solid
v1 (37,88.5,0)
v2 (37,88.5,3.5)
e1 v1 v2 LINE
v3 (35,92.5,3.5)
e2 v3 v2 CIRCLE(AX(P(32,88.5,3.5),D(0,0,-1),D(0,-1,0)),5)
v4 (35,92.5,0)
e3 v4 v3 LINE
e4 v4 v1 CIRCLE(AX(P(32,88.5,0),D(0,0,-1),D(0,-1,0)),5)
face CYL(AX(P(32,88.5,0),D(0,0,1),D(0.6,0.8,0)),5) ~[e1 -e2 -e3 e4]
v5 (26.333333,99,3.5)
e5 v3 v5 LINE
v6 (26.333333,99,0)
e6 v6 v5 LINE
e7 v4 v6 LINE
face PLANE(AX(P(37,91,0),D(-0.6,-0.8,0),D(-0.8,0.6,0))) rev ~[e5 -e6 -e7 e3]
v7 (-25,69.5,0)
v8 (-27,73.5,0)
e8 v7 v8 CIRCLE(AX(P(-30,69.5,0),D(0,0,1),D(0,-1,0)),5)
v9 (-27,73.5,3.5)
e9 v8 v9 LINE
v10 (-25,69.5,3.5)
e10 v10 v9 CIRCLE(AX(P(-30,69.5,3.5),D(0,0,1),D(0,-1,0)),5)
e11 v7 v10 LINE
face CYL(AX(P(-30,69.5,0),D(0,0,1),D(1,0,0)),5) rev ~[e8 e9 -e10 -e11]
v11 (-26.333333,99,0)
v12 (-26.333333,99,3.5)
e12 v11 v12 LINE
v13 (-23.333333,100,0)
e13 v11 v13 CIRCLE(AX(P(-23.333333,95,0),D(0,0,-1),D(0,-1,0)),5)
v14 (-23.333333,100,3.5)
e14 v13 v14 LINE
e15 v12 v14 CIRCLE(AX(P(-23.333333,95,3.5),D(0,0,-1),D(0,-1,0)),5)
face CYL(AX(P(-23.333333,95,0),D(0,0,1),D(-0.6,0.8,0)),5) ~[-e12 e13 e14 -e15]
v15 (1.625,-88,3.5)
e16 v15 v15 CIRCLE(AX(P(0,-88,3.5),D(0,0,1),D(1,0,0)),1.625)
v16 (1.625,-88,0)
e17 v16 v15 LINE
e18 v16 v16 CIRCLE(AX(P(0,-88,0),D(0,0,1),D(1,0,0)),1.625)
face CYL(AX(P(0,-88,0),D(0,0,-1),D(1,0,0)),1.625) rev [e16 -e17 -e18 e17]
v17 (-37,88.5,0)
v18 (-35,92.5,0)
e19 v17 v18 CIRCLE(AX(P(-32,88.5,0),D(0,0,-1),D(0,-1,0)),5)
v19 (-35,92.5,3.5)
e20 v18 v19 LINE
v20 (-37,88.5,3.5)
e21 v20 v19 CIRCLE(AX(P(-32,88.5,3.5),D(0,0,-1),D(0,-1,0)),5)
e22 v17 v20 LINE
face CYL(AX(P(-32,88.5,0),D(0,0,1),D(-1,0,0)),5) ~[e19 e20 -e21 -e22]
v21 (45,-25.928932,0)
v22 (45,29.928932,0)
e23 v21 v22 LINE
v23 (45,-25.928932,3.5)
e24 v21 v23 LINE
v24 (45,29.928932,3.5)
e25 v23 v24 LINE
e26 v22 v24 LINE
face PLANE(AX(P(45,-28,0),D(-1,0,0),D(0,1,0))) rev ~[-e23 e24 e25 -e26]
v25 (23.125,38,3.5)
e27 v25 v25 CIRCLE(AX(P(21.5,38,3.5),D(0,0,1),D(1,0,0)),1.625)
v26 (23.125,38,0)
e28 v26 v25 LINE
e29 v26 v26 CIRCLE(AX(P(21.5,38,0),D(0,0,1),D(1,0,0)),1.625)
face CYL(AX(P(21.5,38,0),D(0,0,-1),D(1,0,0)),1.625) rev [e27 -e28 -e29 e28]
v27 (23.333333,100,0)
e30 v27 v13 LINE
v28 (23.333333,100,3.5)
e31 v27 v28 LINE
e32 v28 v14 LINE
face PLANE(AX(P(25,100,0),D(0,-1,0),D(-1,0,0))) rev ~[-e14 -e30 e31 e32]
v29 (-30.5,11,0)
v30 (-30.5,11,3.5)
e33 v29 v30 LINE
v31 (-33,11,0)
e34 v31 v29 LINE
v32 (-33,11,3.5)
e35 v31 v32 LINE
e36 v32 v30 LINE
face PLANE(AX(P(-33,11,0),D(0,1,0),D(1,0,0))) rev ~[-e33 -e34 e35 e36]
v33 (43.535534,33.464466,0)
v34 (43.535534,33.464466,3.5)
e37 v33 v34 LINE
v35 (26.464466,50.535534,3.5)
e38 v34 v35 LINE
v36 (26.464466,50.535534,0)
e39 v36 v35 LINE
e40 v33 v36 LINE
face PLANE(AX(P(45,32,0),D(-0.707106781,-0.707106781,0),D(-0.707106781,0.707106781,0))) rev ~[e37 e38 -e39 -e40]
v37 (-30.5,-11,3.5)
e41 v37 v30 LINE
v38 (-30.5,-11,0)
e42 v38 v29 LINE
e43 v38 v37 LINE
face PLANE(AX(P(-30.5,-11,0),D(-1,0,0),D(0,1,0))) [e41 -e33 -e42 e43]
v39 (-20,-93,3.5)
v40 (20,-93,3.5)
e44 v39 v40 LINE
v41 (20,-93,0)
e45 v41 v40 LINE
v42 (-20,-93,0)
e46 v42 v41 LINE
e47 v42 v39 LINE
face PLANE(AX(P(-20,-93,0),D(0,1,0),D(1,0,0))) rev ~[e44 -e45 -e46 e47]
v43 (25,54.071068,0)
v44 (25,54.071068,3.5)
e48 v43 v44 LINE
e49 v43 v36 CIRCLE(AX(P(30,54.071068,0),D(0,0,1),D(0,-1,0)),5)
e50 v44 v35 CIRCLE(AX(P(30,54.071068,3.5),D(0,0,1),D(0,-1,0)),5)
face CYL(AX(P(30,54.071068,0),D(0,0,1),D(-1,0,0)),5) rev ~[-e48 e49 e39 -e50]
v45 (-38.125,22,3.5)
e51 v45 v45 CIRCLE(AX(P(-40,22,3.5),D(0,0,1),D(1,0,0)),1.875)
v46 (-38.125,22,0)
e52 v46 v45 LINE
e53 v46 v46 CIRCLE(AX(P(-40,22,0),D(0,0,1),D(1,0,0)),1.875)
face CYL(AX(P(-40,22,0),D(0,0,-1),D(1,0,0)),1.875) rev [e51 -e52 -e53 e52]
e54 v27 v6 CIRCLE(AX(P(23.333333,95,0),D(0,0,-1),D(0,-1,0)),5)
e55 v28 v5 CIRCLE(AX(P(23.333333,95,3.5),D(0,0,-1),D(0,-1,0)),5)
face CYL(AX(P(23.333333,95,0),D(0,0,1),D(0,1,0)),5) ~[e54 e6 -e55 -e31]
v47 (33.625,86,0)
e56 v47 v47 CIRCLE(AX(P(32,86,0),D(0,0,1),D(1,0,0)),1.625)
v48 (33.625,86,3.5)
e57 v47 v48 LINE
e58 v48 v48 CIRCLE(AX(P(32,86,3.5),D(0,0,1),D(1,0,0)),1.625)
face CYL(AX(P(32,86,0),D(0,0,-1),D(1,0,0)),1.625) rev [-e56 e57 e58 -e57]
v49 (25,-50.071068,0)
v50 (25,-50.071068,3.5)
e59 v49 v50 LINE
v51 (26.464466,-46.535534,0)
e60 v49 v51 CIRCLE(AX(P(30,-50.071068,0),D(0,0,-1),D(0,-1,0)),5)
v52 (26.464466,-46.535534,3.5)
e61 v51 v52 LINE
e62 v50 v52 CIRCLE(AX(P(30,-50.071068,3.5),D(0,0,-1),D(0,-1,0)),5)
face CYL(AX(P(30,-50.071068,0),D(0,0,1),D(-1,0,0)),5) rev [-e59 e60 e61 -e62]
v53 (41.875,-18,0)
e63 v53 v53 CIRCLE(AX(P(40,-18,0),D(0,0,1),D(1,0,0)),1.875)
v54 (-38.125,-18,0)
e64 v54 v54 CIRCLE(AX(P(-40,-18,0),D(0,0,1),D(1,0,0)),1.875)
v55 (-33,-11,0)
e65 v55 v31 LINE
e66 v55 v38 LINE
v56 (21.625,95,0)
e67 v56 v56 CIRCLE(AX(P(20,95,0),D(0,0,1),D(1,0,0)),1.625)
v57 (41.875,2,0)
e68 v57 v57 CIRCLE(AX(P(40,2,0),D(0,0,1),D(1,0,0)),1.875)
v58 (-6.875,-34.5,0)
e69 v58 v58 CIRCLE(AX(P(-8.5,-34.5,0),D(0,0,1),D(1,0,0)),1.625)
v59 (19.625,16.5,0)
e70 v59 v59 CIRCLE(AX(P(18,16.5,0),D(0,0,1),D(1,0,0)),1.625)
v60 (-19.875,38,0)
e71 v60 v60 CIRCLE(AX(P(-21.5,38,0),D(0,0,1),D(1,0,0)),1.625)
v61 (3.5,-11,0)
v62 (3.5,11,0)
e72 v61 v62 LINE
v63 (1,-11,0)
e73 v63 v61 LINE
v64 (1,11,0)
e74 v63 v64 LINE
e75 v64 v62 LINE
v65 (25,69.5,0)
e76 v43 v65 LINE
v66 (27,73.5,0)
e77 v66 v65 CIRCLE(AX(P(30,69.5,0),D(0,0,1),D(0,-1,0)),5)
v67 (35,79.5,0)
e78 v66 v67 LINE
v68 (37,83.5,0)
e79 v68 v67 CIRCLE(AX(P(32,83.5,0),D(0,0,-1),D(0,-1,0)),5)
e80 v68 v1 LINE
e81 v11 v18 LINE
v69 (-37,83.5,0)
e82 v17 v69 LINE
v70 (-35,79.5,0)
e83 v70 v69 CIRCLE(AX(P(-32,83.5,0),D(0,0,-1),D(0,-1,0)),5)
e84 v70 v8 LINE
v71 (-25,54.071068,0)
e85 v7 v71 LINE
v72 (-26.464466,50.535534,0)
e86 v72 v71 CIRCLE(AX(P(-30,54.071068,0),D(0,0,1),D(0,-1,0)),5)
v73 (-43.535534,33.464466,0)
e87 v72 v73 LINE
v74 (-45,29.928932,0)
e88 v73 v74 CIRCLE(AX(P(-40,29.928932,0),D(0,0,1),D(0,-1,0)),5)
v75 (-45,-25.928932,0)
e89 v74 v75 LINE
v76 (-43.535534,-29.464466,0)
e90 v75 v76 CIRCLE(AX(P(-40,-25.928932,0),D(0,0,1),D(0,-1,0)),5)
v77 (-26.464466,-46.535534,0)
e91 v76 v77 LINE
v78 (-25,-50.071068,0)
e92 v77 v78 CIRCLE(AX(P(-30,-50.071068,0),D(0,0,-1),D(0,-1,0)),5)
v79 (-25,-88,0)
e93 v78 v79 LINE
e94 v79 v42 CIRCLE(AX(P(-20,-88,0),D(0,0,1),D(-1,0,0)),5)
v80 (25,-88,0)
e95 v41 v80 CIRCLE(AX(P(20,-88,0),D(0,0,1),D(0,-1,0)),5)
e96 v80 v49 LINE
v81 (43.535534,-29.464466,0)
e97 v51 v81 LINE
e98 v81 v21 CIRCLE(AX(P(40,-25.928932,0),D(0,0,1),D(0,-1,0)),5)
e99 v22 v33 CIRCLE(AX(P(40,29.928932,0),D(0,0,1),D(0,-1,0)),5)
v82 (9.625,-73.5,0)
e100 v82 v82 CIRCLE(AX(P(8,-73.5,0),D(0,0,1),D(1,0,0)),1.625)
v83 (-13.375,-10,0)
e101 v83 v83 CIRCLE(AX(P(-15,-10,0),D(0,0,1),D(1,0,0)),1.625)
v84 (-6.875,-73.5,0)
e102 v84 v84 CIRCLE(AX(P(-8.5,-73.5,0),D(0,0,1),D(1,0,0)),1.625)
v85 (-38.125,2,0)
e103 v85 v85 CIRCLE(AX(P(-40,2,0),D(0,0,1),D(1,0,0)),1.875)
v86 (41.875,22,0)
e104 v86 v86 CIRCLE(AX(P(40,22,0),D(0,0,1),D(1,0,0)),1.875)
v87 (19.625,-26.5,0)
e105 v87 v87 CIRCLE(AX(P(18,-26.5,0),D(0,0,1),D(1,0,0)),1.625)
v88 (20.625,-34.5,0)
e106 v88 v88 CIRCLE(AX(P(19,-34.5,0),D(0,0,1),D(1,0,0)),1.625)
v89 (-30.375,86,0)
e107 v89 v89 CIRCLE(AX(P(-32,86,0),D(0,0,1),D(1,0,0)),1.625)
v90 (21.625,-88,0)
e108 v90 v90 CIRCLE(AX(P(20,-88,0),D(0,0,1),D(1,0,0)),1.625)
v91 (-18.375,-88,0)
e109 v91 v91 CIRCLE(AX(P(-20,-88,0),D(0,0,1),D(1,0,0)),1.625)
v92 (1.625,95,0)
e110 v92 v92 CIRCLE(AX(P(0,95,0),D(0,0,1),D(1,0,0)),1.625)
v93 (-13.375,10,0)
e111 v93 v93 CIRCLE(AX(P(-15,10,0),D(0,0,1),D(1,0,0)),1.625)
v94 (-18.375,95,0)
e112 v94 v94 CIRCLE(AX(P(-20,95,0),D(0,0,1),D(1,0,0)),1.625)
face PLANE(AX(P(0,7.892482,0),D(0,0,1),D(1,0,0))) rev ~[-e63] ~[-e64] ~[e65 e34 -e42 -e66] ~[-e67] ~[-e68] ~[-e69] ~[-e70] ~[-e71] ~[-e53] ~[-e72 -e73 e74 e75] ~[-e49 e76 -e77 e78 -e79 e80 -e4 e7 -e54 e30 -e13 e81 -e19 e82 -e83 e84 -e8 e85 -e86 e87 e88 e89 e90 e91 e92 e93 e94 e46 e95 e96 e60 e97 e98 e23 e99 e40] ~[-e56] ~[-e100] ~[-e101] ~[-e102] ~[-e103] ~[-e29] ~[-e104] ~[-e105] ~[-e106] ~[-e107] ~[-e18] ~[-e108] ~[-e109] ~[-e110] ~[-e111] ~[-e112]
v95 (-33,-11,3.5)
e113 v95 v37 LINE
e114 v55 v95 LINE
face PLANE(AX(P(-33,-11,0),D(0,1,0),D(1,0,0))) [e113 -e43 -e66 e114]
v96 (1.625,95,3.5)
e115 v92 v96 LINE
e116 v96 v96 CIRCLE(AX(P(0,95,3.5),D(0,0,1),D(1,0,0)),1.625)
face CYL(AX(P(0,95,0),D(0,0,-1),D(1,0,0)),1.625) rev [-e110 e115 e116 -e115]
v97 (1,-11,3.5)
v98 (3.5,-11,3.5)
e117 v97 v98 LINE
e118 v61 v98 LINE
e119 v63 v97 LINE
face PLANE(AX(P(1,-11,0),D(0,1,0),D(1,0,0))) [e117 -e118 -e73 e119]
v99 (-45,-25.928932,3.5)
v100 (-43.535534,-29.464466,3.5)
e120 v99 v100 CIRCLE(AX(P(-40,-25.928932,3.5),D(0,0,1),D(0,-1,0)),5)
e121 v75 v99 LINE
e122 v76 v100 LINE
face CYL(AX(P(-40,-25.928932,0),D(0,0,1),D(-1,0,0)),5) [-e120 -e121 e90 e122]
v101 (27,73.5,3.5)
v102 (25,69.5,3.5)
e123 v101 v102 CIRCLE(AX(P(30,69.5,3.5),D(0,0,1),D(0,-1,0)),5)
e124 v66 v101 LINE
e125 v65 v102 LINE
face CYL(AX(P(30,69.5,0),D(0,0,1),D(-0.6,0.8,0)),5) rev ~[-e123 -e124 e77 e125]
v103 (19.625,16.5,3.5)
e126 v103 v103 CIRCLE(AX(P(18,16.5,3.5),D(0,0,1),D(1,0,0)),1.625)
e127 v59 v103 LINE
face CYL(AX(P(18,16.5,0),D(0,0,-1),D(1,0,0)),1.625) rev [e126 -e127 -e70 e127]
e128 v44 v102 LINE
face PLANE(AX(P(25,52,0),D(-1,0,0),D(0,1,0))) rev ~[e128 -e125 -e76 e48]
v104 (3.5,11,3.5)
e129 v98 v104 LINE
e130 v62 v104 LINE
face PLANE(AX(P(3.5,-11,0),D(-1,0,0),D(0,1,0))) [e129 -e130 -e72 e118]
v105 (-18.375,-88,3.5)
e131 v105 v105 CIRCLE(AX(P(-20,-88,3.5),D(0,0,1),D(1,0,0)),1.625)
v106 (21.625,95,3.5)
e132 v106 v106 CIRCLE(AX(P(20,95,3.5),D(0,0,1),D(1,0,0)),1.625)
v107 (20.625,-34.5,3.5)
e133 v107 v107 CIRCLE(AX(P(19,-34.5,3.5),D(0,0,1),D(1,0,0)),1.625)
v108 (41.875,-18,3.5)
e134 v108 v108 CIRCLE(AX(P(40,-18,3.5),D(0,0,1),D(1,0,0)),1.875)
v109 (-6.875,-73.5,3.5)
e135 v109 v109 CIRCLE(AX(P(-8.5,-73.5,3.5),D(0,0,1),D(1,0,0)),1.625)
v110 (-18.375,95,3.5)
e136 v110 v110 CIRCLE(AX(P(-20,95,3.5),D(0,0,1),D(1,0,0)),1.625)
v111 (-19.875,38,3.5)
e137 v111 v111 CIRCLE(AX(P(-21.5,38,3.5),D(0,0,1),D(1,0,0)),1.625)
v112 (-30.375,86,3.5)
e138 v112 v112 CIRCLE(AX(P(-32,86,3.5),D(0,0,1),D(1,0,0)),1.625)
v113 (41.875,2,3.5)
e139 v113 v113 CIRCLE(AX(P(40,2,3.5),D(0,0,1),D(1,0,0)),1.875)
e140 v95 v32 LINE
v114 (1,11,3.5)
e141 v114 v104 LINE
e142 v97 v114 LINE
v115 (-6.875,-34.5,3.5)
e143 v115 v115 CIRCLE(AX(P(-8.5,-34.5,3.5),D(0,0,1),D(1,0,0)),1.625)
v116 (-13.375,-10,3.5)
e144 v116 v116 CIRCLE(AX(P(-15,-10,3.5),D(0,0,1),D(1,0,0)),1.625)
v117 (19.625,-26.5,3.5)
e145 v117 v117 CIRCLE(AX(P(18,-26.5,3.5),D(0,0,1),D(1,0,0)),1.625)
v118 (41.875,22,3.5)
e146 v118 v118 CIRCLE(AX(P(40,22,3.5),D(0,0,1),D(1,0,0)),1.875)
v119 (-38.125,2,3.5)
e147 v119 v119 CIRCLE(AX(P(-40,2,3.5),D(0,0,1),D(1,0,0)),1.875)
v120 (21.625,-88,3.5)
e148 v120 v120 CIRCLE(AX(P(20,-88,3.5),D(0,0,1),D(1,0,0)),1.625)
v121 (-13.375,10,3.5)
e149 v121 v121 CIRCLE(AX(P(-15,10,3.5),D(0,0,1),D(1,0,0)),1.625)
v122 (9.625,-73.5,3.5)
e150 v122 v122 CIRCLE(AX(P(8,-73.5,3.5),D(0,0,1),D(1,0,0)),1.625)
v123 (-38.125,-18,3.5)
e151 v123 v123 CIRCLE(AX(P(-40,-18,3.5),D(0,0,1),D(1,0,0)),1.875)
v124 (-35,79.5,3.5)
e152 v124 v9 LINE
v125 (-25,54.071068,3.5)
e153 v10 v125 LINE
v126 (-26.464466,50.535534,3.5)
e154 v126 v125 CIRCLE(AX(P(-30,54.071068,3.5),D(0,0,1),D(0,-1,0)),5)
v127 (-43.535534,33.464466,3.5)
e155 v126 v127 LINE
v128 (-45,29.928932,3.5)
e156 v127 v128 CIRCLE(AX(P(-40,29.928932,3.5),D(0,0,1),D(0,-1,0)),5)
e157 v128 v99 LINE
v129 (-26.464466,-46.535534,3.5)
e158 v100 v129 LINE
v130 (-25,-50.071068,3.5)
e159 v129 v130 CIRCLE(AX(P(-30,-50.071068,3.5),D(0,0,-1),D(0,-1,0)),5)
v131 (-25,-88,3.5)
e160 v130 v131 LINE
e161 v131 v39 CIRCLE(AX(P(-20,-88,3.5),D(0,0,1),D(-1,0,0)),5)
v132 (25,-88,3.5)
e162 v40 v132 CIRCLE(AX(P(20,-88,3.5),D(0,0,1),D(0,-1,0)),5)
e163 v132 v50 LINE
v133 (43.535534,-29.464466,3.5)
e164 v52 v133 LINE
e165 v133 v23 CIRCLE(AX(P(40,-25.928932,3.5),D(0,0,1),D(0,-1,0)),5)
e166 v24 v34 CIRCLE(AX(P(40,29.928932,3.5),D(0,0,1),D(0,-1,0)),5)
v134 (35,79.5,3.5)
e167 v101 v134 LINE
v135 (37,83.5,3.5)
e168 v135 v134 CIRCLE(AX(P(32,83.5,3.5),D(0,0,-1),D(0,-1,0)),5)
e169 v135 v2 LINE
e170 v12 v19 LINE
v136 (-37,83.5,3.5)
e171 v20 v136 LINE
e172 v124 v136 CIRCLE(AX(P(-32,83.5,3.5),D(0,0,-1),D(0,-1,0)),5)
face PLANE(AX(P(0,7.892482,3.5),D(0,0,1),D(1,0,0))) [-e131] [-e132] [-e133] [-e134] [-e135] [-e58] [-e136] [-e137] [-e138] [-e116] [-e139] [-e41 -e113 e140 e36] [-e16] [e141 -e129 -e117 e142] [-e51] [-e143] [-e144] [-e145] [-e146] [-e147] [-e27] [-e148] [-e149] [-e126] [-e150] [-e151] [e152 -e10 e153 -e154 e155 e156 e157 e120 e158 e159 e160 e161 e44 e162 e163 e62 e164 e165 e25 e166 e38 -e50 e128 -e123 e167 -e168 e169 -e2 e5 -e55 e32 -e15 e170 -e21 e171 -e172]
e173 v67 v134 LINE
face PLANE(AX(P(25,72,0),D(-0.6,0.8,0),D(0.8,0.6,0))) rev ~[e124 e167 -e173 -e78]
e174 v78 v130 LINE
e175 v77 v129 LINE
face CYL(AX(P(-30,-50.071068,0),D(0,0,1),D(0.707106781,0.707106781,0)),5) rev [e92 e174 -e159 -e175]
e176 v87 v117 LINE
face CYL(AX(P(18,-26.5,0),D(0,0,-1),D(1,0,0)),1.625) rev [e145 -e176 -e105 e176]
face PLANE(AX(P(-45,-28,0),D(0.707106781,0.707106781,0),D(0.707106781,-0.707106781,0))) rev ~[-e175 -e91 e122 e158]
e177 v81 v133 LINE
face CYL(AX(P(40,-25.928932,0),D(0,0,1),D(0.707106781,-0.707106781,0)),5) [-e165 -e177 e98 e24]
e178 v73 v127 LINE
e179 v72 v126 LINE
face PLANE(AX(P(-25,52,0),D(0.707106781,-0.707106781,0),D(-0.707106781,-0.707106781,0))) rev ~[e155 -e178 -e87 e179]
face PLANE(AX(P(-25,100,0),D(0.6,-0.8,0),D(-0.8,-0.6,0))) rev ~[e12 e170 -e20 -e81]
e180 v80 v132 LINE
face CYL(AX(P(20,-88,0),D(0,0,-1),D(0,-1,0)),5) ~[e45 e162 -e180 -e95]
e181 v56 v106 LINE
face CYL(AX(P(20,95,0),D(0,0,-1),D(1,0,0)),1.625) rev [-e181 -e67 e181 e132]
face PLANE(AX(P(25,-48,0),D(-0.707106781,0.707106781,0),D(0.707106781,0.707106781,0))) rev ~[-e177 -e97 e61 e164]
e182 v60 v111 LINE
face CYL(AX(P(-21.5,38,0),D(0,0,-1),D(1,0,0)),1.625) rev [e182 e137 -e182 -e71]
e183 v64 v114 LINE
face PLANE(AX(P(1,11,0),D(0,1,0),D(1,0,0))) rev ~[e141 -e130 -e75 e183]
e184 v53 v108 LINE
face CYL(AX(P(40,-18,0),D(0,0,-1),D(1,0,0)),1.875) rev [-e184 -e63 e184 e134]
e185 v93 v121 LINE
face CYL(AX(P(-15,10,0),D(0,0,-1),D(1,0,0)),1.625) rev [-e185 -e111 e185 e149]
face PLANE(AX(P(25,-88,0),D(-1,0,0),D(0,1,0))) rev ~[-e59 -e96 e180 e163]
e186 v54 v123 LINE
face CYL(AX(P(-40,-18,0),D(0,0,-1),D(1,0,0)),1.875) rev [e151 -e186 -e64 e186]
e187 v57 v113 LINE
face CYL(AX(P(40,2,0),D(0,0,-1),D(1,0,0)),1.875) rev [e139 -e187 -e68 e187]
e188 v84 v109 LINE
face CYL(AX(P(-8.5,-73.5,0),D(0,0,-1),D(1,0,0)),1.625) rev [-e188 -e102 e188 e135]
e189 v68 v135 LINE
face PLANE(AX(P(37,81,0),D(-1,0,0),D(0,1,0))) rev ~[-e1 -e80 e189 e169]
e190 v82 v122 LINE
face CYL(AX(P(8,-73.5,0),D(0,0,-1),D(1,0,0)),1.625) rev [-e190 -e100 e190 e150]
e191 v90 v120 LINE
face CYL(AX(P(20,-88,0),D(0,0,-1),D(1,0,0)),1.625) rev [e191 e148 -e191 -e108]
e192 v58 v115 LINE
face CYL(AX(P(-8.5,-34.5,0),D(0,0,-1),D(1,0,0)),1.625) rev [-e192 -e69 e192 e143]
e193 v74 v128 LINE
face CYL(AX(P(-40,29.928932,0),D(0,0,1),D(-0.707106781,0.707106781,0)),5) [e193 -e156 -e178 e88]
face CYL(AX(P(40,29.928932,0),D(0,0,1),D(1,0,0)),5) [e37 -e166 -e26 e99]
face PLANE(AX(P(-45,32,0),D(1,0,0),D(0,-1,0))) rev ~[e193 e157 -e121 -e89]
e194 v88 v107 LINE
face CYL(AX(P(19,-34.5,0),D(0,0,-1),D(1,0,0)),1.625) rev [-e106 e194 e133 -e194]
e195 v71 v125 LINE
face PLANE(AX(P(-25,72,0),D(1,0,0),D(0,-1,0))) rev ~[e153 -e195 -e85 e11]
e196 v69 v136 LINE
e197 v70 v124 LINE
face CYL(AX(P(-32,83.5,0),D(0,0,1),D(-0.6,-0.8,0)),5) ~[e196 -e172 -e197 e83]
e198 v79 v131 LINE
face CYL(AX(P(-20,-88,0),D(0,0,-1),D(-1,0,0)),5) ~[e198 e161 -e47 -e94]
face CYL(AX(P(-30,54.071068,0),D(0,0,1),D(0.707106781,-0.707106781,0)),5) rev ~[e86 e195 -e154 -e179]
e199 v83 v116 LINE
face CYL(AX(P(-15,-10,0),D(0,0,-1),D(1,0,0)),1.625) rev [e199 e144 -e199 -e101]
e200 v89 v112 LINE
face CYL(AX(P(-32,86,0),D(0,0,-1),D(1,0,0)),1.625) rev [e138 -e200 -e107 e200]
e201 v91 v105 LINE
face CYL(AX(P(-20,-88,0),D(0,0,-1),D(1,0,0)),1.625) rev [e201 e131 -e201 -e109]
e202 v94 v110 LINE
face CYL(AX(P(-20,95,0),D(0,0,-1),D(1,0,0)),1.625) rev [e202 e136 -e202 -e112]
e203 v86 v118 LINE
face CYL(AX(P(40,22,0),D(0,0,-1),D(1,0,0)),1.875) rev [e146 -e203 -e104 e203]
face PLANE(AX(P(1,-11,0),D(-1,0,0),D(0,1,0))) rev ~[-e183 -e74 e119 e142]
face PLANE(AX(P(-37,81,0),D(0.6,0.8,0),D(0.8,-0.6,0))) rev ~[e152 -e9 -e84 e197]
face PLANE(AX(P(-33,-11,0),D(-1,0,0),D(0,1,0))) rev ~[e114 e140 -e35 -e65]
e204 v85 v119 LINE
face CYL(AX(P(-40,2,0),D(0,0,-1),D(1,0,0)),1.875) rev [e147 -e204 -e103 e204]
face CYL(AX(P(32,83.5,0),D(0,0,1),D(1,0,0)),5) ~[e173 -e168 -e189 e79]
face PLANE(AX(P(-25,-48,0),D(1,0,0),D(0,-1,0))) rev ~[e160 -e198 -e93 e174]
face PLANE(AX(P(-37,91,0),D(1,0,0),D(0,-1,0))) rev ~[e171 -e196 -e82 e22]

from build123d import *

# Parameters (mm, degrees)
F0_R     = 1.625
F0_R_2   = 1.875
F0_W     = 2.5
F0_H     = 22
F1_DEPTH = 3.5
F2_R     = 5


# Not quite as in the source:
# - a feature names something its author has since deleted; it is built from what else it names


with BuildPart() as f1:
    # F0 (on Top) → F1 (new body)
    with BuildSketch(Plane.XY):
        with BuildLine():
            Line((-25, 52), (-45, 32))
            Line((-45, 32), (-45, -28))
            Line((-45, -28), (-25, -48))
            Line((-25, -48), (-25, -88))
            ThreePointArc((-25, -88), (-23.5355339059, -91.5355339059), (-20, -93))
            Line((-20, -93), (20, -93))
            ThreePointArc((20, -93), (23.5355339059, -91.5355339059), (25, -88))
            Line((25, -88), (25, -48))
            Line((25, -48), (45, -28))
            Line((45, -28), (45, 32))
            Line((45, 32), (25, 52))
            Line((25, 52), (25, 72))
            Line((25, 72), (37, 81))
            Line((37, 81), (37, 91))
            Line((37, 91), (25, 100))
            Line((25, 100), (-25, 100))
            Line((-25, 100), (-37, 91))
            Line((-37, 91), (-37, 81))
            Line((-37, 81), (-25, 72))
            Line((-25, 72), (-25, 52))
        make_face()
        with Locations((-20, -88)):
            Circle(F0_R, mode=Mode.SUBTRACT)
        with Locations((-8.5, -73.5)):
            Circle(F0_R, mode=Mode.SUBTRACT)
        with Locations((-40, -18)):
            Circle(F0_R_2, mode=Mode.SUBTRACT)
        with Locations((-40, 2)):
            Circle(F0_R_2, mode=Mode.SUBTRACT)
        with Locations((-31.75, 0)):
            Rectangle(F0_W, F0_H, mode=Mode.SUBTRACT)
        with Locations((-8.5, -34.5)):
            Circle(F0_R, mode=Mode.SUBTRACT)
        with Locations((-15, -10)):
            Circle(F0_R, mode=Mode.SUBTRACT)
        with Locations((0, -88)):
            Circle(F0_R, mode=Mode.SUBTRACT)
        with Locations((8, -73.5)):
            Circle(F0_R, mode=Mode.SUBTRACT)
        with Locations((20, -88)):
            Circle(F0_R, mode=Mode.SUBTRACT)
        with Locations((19, -34.5)):
            Circle(F0_R, mode=Mode.SUBTRACT)
        with Locations((18, -26.5)):
            Circle(F0_R, mode=Mode.SUBTRACT)
        with Locations((2.25, 0)):
            Rectangle(F0_W, F0_H, mode=Mode.SUBTRACT)
        with Locations((40, -18)):
            Circle(F0_R_2, mode=Mode.SUBTRACT)
        with Locations((40, 2)):
            Circle(F0_R_2, mode=Mode.SUBTRACT)
        with Locations((-40, 22)):
            Circle(F0_R_2, mode=Mode.SUBTRACT)
        with Locations((-15, 10)):
            Circle(F0_R, mode=Mode.SUBTRACT)
        with Locations((-21.5, 38)):
            Circle(F0_R, mode=Mode.SUBTRACT)
        with Locations((-32, 86)):
            Circle(F0_R, mode=Mode.SUBTRACT)
        with Locations((-20, 95)):
            Circle(F0_R, mode=Mode.SUBTRACT)
        with Locations((18, 16.5)):
            Circle(F0_R, mode=Mode.SUBTRACT)
        with Locations((21.5, 38)):
            Circle(F0_R, mode=Mode.SUBTRACT)
        with Locations((40, 22)):
            Circle(F0_R_2, mode=Mode.SUBTRACT)
        with Locations((0, 95)):
            Circle(F0_R, mode=Mode.SUBTRACT)
        with Locations((20, 95)):
            Circle(F0_R, mode=Mode.SUBTRACT)
        with Locations((32, 86)):
            Circle(F0_R, mode=Mode.SUBTRACT)
    extrude(amount=F1_DEPTH)

    # F2
    f2_edges = [f1.edges().sort_by_distance(p)[0] for p in [
        (-45, -28, 1.75),
        (-25, -48, 1.75),
        (25, -48, 1.75),
        (45, -28, 1.75),
        (45, 32, 1.75),
        (25, 52, 1.75),
        (25, 72, 1.75),
        (-25, 52, 1.75),
        (-45, 32, 1.75),
        (-25, 72, 1.75),
        (-37, 81, 1.75),
        (-37, 91, 1.75),
        (-25, 100, 1.75),
        (25, 100, 1.75),
        (37, 91, 1.75),
        (37, 81, 1.75),
    ]]
    fillet(f2_edges, radius=F2_R)


solid = f1.part
